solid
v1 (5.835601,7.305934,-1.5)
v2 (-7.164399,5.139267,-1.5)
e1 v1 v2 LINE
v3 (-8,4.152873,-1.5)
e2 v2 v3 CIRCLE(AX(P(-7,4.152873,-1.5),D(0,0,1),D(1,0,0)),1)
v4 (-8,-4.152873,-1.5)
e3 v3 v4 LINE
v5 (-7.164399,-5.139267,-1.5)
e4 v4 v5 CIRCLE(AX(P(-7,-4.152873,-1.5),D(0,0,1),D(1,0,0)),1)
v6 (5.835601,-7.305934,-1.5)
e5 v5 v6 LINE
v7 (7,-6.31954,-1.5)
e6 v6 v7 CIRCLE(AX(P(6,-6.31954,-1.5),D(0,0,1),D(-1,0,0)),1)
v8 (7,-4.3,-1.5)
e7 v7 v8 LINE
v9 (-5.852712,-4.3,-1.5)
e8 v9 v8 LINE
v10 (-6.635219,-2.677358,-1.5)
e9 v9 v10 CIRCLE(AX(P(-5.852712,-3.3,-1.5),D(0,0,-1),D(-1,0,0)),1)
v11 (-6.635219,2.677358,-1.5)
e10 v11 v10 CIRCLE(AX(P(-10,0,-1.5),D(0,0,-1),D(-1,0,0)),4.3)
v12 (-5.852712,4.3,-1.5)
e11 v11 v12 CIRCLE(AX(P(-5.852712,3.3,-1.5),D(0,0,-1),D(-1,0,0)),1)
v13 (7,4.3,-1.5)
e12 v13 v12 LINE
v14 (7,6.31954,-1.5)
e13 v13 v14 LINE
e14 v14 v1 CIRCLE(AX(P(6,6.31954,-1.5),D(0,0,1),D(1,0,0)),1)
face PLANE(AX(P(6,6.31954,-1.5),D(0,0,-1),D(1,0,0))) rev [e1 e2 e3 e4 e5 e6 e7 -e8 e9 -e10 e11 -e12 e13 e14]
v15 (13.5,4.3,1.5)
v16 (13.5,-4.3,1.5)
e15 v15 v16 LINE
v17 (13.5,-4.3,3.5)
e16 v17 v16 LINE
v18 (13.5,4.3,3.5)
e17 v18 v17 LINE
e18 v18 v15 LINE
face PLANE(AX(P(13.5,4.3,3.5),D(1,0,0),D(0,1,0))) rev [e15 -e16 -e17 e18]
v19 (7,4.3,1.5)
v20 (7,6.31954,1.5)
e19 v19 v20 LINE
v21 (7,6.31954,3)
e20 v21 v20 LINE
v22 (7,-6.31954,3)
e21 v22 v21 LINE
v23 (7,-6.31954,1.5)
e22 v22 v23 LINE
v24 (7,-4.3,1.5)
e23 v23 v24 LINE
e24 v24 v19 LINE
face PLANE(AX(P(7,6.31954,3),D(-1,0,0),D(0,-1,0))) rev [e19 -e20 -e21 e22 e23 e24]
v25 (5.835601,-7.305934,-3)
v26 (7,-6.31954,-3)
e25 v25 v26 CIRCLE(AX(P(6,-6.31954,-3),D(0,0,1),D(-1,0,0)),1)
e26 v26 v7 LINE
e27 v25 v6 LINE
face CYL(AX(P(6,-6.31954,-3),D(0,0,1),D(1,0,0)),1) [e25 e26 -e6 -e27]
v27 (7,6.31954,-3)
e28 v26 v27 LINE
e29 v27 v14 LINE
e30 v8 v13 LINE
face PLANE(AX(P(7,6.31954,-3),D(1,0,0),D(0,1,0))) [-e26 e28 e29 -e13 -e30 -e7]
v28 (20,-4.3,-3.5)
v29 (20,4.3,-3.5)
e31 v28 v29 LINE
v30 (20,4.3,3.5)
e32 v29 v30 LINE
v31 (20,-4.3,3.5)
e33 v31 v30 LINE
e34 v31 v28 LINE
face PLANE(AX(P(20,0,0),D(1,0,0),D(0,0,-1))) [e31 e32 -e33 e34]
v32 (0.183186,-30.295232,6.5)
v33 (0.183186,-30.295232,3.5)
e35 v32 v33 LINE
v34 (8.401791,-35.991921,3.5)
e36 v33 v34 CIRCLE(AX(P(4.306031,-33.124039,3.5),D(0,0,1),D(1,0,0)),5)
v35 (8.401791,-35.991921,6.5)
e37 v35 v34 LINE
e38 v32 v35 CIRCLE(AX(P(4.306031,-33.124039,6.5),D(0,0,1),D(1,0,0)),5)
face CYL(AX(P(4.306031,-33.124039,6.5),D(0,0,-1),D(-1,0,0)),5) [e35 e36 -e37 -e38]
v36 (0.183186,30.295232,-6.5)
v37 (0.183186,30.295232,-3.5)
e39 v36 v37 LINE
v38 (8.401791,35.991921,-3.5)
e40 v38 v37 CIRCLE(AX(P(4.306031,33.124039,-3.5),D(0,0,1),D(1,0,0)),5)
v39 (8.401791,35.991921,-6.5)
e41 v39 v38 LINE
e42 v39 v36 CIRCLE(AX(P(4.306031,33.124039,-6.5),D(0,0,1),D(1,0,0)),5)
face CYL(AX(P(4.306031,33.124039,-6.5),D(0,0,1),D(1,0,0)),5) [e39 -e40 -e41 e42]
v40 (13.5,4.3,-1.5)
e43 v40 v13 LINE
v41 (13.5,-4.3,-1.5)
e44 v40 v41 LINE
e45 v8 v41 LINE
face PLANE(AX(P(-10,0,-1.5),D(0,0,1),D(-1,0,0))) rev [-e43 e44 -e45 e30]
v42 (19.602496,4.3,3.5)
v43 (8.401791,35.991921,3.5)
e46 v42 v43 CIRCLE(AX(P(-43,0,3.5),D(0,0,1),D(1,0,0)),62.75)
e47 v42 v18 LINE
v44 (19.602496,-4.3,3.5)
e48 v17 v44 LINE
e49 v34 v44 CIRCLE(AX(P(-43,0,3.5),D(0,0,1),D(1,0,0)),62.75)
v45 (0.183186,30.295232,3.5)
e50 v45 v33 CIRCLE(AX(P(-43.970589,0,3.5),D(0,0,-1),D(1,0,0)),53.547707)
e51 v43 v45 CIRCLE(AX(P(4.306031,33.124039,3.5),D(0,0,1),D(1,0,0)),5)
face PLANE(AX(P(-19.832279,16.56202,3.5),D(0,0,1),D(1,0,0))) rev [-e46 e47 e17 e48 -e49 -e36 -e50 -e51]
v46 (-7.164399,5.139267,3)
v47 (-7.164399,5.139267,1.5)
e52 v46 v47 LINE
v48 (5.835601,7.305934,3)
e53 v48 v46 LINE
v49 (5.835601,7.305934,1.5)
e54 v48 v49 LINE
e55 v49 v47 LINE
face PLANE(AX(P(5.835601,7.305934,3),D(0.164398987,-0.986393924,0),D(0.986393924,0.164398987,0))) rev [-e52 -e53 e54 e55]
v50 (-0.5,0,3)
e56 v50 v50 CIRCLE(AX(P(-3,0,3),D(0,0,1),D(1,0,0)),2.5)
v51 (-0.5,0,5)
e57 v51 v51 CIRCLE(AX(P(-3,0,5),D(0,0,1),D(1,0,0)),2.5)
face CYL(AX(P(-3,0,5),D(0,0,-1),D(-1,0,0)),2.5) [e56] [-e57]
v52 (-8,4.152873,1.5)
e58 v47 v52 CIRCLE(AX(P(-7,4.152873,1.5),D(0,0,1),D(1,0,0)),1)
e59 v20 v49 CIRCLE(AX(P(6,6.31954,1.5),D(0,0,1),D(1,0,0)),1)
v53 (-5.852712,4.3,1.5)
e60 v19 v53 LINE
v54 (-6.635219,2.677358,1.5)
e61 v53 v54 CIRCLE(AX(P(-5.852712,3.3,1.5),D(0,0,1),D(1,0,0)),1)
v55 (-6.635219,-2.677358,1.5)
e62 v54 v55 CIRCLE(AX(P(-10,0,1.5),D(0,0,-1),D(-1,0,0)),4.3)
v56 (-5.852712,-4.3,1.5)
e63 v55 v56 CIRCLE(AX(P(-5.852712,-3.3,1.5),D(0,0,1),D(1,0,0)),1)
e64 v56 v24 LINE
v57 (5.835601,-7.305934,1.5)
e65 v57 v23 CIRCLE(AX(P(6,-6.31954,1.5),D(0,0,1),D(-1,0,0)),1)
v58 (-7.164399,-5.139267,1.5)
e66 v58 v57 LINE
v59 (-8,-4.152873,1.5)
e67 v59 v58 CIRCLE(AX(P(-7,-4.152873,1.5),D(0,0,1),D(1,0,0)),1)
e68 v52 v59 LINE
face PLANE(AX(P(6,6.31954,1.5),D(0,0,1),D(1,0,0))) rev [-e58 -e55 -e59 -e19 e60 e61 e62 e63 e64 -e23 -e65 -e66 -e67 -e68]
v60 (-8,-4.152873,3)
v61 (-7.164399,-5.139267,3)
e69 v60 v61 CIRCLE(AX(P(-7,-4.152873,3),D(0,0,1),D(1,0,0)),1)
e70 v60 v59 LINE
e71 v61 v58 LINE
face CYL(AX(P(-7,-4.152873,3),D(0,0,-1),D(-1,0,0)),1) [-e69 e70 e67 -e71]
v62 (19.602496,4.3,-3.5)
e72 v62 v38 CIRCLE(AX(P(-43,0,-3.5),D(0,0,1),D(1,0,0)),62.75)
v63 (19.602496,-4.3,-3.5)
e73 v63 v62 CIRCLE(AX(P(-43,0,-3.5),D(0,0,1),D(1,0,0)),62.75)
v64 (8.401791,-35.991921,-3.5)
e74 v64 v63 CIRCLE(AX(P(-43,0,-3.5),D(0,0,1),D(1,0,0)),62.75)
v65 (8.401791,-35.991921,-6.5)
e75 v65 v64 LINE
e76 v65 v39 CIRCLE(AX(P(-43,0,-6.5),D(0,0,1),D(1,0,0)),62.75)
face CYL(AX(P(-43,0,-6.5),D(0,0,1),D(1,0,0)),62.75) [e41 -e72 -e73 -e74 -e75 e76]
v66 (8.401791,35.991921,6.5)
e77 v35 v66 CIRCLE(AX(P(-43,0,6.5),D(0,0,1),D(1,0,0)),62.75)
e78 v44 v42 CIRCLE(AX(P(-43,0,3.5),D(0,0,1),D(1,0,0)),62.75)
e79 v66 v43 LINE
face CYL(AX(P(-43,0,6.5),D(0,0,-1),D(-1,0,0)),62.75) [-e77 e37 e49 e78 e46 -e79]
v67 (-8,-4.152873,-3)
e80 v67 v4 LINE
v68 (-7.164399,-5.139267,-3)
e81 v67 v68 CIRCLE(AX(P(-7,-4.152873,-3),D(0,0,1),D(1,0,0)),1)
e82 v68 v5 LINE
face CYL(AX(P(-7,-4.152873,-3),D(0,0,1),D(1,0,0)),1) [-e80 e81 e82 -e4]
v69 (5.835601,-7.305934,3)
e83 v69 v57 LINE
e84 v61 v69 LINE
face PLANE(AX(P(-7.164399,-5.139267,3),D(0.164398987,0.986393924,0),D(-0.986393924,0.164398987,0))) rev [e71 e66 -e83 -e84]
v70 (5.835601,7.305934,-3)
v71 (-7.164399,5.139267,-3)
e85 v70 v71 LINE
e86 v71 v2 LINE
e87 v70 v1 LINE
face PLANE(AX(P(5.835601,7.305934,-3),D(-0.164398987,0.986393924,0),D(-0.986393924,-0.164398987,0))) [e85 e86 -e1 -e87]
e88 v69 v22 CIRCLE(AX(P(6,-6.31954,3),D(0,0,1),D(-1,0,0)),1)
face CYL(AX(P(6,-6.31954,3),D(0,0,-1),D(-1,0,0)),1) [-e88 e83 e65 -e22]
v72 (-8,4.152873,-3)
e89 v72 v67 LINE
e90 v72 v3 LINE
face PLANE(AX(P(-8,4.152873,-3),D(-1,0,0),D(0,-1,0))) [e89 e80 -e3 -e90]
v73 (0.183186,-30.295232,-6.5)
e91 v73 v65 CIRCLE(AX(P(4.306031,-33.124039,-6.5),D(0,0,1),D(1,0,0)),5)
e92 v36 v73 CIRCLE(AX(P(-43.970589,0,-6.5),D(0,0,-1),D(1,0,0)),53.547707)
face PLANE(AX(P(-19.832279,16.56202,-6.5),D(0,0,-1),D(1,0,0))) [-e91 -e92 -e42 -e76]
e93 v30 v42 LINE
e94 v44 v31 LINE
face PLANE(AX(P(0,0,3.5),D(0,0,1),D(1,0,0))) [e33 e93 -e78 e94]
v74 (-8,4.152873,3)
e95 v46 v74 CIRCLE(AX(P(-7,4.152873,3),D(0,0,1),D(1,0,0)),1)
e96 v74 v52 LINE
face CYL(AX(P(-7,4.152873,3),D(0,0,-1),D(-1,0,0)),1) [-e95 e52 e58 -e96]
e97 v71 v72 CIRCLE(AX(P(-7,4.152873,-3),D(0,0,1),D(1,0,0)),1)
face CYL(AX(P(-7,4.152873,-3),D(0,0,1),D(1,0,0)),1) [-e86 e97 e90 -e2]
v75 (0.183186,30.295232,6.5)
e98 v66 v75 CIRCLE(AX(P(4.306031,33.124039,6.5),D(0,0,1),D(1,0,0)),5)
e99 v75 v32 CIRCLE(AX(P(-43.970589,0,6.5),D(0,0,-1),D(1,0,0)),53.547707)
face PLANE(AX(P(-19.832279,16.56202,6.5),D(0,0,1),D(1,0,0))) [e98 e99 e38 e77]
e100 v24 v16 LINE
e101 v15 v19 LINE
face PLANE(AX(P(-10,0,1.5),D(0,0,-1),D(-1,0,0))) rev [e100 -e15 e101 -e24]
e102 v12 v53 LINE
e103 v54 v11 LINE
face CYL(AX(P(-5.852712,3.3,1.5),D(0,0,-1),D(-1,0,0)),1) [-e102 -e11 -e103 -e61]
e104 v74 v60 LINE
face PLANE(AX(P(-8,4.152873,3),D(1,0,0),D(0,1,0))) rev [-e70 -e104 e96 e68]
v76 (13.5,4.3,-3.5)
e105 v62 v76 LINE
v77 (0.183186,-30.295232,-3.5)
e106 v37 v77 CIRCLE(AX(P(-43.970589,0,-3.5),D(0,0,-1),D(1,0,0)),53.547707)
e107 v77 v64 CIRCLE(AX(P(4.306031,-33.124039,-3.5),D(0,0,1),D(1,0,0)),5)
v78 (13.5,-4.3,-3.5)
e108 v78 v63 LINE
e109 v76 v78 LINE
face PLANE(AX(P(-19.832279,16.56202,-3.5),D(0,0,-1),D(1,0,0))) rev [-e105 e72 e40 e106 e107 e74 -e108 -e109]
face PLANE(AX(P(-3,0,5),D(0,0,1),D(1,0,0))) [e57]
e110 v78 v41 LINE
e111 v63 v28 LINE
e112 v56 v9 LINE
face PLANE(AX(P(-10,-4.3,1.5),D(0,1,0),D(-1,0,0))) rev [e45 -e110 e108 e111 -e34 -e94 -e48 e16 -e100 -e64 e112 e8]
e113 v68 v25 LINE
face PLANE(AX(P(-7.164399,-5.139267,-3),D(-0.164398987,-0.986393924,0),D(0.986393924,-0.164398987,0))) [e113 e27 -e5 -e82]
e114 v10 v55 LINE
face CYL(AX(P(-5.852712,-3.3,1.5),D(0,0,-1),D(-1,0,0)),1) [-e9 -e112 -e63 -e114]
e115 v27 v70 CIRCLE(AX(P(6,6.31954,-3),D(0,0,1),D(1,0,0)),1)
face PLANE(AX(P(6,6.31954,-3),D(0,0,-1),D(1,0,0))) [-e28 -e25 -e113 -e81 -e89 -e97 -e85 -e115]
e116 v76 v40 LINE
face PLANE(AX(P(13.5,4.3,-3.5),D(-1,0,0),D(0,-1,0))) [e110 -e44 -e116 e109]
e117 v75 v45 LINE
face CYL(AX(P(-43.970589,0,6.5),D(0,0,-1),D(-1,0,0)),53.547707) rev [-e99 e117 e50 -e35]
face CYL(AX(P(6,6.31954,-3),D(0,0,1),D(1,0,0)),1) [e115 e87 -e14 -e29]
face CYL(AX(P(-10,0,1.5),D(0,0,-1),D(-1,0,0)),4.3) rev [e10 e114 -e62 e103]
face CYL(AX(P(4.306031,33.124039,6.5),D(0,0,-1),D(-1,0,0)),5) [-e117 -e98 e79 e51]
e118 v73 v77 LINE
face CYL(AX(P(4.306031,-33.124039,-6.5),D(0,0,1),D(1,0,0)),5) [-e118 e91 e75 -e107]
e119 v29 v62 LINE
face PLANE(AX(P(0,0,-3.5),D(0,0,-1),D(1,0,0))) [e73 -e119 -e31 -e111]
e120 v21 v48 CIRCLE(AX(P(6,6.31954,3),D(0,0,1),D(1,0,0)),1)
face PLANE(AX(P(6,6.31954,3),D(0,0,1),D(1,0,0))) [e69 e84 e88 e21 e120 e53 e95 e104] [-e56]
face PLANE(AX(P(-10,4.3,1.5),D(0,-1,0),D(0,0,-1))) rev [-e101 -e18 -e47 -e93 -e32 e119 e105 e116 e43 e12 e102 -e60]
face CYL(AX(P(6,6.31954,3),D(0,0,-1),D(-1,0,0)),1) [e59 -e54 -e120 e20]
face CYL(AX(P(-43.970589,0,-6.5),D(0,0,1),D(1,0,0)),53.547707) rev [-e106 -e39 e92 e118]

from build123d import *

# Parameters (mm, degrees)
BOSS_EXTRUDE2_DEPTH = 1.5
BOSS_EXTRUDE4_DEPTH = 1.5
FILLET2_START       = -1.5
FILLET2_DEPTH       = 3
SKETCH4_R           = 2.5
BOSS_EXTRUDE5_DEPTH = 2
SKETCH7_W           = 3
SKETCH7_H           = 8.6
BOSS_EXTRUDE6_DEPTH = 10
SKETCH9_W           = 6.5
SKETCH9_H           = 8.6
BOSS_EXTRUDE7_DEPTH = 2
BOSS_EXTRUDE8_DEPTH = 3


with BuildPart() as part:
    # Sketch1 → Boss-Extrude2 (new body)
    with BuildSketch(Plane.XY):
        with BuildLine():
            Line((-10, 4.3), (10, 4.3))
            Line((10, 4.3), (10, -4.3))
            Line((10, -4.3), (-10, -4.3))
            ThreePointArc((-10, -4.3), (-5.7, 0), (-10, 4.3))
        make_face()
    boss_extrude2 = extrude(amount=BOSS_EXTRUDE2_DEPTH)

    # Sketch3 → Boss-Extrude4 (add)
    with BuildSketch(Plane.XY.offset(1.5)):
        with BuildLine():
            Line((7, 6.319539578), (7, -6.319539578))
            ThreePointArc((7, -6.319539578), (6.646374896, -7.082559561), (5.835601013, -7.305933502))
            Line((5.835601013, -7.305933502), (-7.164398987, -5.139266835))
            ThreePointArc((-7.164398987, -5.139266835), (-7.763019982, -4.799247808), (-8, -4.152872912))
            Line((-8, -4.152872912), (-8, 4.152872912))
            ThreePointArc((-8, 4.152872912), (-7.763019982, 4.799247808), (-7.164398987, 5.139266835))
            Line((-7.164398987, 5.139266835), (5.835601013, 7.305933502))
            ThreePointArc((5.835601013, 7.305933502), (6.646374896, 7.082559561), (7, 6.319539578))
        make_face()
    boss_extrude4 = extrude(amount=BOSS_EXTRUDE4_DEPTH)

    # Mirror1: Boss-Extrude2, Boss-Extrude4 across plane
    add(boss_extrude2.mirror(Plane(origin=(-10, 0, 0), x_dir=(1, 0, 0), z_dir=(0, 0, -1))))
    add(boss_extrude4.mirror(Plane(origin=(-10, 0, 0), x_dir=(1, 0, 0), z_dir=(0, 0, -1))))

    # Fillet2: read off the stored shape, not the designer's step
    # Fillet2 outline → Fillet2 (cut)
    with BuildSketch(Plane.XY.offset(FILLET2_START)):
        with BuildLine():
            Line((-10, -4.3), (-5.852711729, -4.3))
            ThreePointArc((-5.852711729, -4.3), (-6.753445183, -3.734372243), (-6.63521895, -2.677358491))
            ThreePointArc((-6.63521895, -2.677358491), (-8.132199356, -3.873153851), (-10, -4.3))
        make_face()
        with BuildLine():
            ThreePointArc((-10, 4.3), (-8.132199356, 3.873153851), (-6.63521895, 2.677358491))
            ThreePointArc((-6.63521895, 2.677358491), (-6.753445183, 3.734372243), (-5.852711729, 4.3))
            Line((-5.852711729, 4.3), (-10, 4.3))
        make_face()
    extrude(amount=FILLET2_DEPTH, mode=Mode.SUBTRACT)

    # Sketch4 → Boss-Extrude5 (add)
    with BuildSketch(Plane.XY.offset(3)):
        with Locations((-3, 0)):
            Circle(SKETCH4_R)
    extrude(amount=BOSS_EXTRUDE5_DEPTH)

    # Sketch7 → Boss-Extrude6 (add)
    with BuildSketch(Plane(origin=(10, 0, 0), x_dir=(0, 0, -1), z_dir=(1, 0, 0))):
        Rectangle(SKETCH7_W, SKETCH7_H)
    extrude(amount=BOSS_EXTRUDE6_DEPTH)

    # Sketch9 → Boss-Extrude7 (add)
    with BuildSketch(Plane.XY.offset(1.5)):
        with Locations((16.75, 0)):
            Rectangle(SKETCH9_W, SKETCH9_H)
    boss_extrude7 = extrude(amount=BOSS_EXTRUDE7_DEPTH)

    # Sketch10 → Boss-Extrude8 (add)
    with BuildSketch(Plane.XY.offset(3.5)):
        with BuildLine():
            ThreePointArc((8.401790779, 35.991921381), (1.457653493, 37.233388065), (0.183185936, 30.295231636))
            ThreePointArc((0.183185936, 30.295231636), (9.577117756, 0), (0.183185936, -30.295231636))
            ThreePointArc((0.183185936, -30.295231636), (1.457653493, -37.233388065), (8.401790779, -35.991921381))
            ThreePointArc((8.401790779, -35.991921381), (19.75, 0), (8.401790779, 35.991921381))
        make_face()
    boss_extrude8 = extrude(amount=BOSS_EXTRUDE8_DEPTH)

    # Mirror2: Boss-Extrude7, Boss-Extrude8 across plane
    add(boss_extrude7.mirror(Plane.XY))
    add(boss_extrude8.mirror(Plane.XY))


solid = part.part
